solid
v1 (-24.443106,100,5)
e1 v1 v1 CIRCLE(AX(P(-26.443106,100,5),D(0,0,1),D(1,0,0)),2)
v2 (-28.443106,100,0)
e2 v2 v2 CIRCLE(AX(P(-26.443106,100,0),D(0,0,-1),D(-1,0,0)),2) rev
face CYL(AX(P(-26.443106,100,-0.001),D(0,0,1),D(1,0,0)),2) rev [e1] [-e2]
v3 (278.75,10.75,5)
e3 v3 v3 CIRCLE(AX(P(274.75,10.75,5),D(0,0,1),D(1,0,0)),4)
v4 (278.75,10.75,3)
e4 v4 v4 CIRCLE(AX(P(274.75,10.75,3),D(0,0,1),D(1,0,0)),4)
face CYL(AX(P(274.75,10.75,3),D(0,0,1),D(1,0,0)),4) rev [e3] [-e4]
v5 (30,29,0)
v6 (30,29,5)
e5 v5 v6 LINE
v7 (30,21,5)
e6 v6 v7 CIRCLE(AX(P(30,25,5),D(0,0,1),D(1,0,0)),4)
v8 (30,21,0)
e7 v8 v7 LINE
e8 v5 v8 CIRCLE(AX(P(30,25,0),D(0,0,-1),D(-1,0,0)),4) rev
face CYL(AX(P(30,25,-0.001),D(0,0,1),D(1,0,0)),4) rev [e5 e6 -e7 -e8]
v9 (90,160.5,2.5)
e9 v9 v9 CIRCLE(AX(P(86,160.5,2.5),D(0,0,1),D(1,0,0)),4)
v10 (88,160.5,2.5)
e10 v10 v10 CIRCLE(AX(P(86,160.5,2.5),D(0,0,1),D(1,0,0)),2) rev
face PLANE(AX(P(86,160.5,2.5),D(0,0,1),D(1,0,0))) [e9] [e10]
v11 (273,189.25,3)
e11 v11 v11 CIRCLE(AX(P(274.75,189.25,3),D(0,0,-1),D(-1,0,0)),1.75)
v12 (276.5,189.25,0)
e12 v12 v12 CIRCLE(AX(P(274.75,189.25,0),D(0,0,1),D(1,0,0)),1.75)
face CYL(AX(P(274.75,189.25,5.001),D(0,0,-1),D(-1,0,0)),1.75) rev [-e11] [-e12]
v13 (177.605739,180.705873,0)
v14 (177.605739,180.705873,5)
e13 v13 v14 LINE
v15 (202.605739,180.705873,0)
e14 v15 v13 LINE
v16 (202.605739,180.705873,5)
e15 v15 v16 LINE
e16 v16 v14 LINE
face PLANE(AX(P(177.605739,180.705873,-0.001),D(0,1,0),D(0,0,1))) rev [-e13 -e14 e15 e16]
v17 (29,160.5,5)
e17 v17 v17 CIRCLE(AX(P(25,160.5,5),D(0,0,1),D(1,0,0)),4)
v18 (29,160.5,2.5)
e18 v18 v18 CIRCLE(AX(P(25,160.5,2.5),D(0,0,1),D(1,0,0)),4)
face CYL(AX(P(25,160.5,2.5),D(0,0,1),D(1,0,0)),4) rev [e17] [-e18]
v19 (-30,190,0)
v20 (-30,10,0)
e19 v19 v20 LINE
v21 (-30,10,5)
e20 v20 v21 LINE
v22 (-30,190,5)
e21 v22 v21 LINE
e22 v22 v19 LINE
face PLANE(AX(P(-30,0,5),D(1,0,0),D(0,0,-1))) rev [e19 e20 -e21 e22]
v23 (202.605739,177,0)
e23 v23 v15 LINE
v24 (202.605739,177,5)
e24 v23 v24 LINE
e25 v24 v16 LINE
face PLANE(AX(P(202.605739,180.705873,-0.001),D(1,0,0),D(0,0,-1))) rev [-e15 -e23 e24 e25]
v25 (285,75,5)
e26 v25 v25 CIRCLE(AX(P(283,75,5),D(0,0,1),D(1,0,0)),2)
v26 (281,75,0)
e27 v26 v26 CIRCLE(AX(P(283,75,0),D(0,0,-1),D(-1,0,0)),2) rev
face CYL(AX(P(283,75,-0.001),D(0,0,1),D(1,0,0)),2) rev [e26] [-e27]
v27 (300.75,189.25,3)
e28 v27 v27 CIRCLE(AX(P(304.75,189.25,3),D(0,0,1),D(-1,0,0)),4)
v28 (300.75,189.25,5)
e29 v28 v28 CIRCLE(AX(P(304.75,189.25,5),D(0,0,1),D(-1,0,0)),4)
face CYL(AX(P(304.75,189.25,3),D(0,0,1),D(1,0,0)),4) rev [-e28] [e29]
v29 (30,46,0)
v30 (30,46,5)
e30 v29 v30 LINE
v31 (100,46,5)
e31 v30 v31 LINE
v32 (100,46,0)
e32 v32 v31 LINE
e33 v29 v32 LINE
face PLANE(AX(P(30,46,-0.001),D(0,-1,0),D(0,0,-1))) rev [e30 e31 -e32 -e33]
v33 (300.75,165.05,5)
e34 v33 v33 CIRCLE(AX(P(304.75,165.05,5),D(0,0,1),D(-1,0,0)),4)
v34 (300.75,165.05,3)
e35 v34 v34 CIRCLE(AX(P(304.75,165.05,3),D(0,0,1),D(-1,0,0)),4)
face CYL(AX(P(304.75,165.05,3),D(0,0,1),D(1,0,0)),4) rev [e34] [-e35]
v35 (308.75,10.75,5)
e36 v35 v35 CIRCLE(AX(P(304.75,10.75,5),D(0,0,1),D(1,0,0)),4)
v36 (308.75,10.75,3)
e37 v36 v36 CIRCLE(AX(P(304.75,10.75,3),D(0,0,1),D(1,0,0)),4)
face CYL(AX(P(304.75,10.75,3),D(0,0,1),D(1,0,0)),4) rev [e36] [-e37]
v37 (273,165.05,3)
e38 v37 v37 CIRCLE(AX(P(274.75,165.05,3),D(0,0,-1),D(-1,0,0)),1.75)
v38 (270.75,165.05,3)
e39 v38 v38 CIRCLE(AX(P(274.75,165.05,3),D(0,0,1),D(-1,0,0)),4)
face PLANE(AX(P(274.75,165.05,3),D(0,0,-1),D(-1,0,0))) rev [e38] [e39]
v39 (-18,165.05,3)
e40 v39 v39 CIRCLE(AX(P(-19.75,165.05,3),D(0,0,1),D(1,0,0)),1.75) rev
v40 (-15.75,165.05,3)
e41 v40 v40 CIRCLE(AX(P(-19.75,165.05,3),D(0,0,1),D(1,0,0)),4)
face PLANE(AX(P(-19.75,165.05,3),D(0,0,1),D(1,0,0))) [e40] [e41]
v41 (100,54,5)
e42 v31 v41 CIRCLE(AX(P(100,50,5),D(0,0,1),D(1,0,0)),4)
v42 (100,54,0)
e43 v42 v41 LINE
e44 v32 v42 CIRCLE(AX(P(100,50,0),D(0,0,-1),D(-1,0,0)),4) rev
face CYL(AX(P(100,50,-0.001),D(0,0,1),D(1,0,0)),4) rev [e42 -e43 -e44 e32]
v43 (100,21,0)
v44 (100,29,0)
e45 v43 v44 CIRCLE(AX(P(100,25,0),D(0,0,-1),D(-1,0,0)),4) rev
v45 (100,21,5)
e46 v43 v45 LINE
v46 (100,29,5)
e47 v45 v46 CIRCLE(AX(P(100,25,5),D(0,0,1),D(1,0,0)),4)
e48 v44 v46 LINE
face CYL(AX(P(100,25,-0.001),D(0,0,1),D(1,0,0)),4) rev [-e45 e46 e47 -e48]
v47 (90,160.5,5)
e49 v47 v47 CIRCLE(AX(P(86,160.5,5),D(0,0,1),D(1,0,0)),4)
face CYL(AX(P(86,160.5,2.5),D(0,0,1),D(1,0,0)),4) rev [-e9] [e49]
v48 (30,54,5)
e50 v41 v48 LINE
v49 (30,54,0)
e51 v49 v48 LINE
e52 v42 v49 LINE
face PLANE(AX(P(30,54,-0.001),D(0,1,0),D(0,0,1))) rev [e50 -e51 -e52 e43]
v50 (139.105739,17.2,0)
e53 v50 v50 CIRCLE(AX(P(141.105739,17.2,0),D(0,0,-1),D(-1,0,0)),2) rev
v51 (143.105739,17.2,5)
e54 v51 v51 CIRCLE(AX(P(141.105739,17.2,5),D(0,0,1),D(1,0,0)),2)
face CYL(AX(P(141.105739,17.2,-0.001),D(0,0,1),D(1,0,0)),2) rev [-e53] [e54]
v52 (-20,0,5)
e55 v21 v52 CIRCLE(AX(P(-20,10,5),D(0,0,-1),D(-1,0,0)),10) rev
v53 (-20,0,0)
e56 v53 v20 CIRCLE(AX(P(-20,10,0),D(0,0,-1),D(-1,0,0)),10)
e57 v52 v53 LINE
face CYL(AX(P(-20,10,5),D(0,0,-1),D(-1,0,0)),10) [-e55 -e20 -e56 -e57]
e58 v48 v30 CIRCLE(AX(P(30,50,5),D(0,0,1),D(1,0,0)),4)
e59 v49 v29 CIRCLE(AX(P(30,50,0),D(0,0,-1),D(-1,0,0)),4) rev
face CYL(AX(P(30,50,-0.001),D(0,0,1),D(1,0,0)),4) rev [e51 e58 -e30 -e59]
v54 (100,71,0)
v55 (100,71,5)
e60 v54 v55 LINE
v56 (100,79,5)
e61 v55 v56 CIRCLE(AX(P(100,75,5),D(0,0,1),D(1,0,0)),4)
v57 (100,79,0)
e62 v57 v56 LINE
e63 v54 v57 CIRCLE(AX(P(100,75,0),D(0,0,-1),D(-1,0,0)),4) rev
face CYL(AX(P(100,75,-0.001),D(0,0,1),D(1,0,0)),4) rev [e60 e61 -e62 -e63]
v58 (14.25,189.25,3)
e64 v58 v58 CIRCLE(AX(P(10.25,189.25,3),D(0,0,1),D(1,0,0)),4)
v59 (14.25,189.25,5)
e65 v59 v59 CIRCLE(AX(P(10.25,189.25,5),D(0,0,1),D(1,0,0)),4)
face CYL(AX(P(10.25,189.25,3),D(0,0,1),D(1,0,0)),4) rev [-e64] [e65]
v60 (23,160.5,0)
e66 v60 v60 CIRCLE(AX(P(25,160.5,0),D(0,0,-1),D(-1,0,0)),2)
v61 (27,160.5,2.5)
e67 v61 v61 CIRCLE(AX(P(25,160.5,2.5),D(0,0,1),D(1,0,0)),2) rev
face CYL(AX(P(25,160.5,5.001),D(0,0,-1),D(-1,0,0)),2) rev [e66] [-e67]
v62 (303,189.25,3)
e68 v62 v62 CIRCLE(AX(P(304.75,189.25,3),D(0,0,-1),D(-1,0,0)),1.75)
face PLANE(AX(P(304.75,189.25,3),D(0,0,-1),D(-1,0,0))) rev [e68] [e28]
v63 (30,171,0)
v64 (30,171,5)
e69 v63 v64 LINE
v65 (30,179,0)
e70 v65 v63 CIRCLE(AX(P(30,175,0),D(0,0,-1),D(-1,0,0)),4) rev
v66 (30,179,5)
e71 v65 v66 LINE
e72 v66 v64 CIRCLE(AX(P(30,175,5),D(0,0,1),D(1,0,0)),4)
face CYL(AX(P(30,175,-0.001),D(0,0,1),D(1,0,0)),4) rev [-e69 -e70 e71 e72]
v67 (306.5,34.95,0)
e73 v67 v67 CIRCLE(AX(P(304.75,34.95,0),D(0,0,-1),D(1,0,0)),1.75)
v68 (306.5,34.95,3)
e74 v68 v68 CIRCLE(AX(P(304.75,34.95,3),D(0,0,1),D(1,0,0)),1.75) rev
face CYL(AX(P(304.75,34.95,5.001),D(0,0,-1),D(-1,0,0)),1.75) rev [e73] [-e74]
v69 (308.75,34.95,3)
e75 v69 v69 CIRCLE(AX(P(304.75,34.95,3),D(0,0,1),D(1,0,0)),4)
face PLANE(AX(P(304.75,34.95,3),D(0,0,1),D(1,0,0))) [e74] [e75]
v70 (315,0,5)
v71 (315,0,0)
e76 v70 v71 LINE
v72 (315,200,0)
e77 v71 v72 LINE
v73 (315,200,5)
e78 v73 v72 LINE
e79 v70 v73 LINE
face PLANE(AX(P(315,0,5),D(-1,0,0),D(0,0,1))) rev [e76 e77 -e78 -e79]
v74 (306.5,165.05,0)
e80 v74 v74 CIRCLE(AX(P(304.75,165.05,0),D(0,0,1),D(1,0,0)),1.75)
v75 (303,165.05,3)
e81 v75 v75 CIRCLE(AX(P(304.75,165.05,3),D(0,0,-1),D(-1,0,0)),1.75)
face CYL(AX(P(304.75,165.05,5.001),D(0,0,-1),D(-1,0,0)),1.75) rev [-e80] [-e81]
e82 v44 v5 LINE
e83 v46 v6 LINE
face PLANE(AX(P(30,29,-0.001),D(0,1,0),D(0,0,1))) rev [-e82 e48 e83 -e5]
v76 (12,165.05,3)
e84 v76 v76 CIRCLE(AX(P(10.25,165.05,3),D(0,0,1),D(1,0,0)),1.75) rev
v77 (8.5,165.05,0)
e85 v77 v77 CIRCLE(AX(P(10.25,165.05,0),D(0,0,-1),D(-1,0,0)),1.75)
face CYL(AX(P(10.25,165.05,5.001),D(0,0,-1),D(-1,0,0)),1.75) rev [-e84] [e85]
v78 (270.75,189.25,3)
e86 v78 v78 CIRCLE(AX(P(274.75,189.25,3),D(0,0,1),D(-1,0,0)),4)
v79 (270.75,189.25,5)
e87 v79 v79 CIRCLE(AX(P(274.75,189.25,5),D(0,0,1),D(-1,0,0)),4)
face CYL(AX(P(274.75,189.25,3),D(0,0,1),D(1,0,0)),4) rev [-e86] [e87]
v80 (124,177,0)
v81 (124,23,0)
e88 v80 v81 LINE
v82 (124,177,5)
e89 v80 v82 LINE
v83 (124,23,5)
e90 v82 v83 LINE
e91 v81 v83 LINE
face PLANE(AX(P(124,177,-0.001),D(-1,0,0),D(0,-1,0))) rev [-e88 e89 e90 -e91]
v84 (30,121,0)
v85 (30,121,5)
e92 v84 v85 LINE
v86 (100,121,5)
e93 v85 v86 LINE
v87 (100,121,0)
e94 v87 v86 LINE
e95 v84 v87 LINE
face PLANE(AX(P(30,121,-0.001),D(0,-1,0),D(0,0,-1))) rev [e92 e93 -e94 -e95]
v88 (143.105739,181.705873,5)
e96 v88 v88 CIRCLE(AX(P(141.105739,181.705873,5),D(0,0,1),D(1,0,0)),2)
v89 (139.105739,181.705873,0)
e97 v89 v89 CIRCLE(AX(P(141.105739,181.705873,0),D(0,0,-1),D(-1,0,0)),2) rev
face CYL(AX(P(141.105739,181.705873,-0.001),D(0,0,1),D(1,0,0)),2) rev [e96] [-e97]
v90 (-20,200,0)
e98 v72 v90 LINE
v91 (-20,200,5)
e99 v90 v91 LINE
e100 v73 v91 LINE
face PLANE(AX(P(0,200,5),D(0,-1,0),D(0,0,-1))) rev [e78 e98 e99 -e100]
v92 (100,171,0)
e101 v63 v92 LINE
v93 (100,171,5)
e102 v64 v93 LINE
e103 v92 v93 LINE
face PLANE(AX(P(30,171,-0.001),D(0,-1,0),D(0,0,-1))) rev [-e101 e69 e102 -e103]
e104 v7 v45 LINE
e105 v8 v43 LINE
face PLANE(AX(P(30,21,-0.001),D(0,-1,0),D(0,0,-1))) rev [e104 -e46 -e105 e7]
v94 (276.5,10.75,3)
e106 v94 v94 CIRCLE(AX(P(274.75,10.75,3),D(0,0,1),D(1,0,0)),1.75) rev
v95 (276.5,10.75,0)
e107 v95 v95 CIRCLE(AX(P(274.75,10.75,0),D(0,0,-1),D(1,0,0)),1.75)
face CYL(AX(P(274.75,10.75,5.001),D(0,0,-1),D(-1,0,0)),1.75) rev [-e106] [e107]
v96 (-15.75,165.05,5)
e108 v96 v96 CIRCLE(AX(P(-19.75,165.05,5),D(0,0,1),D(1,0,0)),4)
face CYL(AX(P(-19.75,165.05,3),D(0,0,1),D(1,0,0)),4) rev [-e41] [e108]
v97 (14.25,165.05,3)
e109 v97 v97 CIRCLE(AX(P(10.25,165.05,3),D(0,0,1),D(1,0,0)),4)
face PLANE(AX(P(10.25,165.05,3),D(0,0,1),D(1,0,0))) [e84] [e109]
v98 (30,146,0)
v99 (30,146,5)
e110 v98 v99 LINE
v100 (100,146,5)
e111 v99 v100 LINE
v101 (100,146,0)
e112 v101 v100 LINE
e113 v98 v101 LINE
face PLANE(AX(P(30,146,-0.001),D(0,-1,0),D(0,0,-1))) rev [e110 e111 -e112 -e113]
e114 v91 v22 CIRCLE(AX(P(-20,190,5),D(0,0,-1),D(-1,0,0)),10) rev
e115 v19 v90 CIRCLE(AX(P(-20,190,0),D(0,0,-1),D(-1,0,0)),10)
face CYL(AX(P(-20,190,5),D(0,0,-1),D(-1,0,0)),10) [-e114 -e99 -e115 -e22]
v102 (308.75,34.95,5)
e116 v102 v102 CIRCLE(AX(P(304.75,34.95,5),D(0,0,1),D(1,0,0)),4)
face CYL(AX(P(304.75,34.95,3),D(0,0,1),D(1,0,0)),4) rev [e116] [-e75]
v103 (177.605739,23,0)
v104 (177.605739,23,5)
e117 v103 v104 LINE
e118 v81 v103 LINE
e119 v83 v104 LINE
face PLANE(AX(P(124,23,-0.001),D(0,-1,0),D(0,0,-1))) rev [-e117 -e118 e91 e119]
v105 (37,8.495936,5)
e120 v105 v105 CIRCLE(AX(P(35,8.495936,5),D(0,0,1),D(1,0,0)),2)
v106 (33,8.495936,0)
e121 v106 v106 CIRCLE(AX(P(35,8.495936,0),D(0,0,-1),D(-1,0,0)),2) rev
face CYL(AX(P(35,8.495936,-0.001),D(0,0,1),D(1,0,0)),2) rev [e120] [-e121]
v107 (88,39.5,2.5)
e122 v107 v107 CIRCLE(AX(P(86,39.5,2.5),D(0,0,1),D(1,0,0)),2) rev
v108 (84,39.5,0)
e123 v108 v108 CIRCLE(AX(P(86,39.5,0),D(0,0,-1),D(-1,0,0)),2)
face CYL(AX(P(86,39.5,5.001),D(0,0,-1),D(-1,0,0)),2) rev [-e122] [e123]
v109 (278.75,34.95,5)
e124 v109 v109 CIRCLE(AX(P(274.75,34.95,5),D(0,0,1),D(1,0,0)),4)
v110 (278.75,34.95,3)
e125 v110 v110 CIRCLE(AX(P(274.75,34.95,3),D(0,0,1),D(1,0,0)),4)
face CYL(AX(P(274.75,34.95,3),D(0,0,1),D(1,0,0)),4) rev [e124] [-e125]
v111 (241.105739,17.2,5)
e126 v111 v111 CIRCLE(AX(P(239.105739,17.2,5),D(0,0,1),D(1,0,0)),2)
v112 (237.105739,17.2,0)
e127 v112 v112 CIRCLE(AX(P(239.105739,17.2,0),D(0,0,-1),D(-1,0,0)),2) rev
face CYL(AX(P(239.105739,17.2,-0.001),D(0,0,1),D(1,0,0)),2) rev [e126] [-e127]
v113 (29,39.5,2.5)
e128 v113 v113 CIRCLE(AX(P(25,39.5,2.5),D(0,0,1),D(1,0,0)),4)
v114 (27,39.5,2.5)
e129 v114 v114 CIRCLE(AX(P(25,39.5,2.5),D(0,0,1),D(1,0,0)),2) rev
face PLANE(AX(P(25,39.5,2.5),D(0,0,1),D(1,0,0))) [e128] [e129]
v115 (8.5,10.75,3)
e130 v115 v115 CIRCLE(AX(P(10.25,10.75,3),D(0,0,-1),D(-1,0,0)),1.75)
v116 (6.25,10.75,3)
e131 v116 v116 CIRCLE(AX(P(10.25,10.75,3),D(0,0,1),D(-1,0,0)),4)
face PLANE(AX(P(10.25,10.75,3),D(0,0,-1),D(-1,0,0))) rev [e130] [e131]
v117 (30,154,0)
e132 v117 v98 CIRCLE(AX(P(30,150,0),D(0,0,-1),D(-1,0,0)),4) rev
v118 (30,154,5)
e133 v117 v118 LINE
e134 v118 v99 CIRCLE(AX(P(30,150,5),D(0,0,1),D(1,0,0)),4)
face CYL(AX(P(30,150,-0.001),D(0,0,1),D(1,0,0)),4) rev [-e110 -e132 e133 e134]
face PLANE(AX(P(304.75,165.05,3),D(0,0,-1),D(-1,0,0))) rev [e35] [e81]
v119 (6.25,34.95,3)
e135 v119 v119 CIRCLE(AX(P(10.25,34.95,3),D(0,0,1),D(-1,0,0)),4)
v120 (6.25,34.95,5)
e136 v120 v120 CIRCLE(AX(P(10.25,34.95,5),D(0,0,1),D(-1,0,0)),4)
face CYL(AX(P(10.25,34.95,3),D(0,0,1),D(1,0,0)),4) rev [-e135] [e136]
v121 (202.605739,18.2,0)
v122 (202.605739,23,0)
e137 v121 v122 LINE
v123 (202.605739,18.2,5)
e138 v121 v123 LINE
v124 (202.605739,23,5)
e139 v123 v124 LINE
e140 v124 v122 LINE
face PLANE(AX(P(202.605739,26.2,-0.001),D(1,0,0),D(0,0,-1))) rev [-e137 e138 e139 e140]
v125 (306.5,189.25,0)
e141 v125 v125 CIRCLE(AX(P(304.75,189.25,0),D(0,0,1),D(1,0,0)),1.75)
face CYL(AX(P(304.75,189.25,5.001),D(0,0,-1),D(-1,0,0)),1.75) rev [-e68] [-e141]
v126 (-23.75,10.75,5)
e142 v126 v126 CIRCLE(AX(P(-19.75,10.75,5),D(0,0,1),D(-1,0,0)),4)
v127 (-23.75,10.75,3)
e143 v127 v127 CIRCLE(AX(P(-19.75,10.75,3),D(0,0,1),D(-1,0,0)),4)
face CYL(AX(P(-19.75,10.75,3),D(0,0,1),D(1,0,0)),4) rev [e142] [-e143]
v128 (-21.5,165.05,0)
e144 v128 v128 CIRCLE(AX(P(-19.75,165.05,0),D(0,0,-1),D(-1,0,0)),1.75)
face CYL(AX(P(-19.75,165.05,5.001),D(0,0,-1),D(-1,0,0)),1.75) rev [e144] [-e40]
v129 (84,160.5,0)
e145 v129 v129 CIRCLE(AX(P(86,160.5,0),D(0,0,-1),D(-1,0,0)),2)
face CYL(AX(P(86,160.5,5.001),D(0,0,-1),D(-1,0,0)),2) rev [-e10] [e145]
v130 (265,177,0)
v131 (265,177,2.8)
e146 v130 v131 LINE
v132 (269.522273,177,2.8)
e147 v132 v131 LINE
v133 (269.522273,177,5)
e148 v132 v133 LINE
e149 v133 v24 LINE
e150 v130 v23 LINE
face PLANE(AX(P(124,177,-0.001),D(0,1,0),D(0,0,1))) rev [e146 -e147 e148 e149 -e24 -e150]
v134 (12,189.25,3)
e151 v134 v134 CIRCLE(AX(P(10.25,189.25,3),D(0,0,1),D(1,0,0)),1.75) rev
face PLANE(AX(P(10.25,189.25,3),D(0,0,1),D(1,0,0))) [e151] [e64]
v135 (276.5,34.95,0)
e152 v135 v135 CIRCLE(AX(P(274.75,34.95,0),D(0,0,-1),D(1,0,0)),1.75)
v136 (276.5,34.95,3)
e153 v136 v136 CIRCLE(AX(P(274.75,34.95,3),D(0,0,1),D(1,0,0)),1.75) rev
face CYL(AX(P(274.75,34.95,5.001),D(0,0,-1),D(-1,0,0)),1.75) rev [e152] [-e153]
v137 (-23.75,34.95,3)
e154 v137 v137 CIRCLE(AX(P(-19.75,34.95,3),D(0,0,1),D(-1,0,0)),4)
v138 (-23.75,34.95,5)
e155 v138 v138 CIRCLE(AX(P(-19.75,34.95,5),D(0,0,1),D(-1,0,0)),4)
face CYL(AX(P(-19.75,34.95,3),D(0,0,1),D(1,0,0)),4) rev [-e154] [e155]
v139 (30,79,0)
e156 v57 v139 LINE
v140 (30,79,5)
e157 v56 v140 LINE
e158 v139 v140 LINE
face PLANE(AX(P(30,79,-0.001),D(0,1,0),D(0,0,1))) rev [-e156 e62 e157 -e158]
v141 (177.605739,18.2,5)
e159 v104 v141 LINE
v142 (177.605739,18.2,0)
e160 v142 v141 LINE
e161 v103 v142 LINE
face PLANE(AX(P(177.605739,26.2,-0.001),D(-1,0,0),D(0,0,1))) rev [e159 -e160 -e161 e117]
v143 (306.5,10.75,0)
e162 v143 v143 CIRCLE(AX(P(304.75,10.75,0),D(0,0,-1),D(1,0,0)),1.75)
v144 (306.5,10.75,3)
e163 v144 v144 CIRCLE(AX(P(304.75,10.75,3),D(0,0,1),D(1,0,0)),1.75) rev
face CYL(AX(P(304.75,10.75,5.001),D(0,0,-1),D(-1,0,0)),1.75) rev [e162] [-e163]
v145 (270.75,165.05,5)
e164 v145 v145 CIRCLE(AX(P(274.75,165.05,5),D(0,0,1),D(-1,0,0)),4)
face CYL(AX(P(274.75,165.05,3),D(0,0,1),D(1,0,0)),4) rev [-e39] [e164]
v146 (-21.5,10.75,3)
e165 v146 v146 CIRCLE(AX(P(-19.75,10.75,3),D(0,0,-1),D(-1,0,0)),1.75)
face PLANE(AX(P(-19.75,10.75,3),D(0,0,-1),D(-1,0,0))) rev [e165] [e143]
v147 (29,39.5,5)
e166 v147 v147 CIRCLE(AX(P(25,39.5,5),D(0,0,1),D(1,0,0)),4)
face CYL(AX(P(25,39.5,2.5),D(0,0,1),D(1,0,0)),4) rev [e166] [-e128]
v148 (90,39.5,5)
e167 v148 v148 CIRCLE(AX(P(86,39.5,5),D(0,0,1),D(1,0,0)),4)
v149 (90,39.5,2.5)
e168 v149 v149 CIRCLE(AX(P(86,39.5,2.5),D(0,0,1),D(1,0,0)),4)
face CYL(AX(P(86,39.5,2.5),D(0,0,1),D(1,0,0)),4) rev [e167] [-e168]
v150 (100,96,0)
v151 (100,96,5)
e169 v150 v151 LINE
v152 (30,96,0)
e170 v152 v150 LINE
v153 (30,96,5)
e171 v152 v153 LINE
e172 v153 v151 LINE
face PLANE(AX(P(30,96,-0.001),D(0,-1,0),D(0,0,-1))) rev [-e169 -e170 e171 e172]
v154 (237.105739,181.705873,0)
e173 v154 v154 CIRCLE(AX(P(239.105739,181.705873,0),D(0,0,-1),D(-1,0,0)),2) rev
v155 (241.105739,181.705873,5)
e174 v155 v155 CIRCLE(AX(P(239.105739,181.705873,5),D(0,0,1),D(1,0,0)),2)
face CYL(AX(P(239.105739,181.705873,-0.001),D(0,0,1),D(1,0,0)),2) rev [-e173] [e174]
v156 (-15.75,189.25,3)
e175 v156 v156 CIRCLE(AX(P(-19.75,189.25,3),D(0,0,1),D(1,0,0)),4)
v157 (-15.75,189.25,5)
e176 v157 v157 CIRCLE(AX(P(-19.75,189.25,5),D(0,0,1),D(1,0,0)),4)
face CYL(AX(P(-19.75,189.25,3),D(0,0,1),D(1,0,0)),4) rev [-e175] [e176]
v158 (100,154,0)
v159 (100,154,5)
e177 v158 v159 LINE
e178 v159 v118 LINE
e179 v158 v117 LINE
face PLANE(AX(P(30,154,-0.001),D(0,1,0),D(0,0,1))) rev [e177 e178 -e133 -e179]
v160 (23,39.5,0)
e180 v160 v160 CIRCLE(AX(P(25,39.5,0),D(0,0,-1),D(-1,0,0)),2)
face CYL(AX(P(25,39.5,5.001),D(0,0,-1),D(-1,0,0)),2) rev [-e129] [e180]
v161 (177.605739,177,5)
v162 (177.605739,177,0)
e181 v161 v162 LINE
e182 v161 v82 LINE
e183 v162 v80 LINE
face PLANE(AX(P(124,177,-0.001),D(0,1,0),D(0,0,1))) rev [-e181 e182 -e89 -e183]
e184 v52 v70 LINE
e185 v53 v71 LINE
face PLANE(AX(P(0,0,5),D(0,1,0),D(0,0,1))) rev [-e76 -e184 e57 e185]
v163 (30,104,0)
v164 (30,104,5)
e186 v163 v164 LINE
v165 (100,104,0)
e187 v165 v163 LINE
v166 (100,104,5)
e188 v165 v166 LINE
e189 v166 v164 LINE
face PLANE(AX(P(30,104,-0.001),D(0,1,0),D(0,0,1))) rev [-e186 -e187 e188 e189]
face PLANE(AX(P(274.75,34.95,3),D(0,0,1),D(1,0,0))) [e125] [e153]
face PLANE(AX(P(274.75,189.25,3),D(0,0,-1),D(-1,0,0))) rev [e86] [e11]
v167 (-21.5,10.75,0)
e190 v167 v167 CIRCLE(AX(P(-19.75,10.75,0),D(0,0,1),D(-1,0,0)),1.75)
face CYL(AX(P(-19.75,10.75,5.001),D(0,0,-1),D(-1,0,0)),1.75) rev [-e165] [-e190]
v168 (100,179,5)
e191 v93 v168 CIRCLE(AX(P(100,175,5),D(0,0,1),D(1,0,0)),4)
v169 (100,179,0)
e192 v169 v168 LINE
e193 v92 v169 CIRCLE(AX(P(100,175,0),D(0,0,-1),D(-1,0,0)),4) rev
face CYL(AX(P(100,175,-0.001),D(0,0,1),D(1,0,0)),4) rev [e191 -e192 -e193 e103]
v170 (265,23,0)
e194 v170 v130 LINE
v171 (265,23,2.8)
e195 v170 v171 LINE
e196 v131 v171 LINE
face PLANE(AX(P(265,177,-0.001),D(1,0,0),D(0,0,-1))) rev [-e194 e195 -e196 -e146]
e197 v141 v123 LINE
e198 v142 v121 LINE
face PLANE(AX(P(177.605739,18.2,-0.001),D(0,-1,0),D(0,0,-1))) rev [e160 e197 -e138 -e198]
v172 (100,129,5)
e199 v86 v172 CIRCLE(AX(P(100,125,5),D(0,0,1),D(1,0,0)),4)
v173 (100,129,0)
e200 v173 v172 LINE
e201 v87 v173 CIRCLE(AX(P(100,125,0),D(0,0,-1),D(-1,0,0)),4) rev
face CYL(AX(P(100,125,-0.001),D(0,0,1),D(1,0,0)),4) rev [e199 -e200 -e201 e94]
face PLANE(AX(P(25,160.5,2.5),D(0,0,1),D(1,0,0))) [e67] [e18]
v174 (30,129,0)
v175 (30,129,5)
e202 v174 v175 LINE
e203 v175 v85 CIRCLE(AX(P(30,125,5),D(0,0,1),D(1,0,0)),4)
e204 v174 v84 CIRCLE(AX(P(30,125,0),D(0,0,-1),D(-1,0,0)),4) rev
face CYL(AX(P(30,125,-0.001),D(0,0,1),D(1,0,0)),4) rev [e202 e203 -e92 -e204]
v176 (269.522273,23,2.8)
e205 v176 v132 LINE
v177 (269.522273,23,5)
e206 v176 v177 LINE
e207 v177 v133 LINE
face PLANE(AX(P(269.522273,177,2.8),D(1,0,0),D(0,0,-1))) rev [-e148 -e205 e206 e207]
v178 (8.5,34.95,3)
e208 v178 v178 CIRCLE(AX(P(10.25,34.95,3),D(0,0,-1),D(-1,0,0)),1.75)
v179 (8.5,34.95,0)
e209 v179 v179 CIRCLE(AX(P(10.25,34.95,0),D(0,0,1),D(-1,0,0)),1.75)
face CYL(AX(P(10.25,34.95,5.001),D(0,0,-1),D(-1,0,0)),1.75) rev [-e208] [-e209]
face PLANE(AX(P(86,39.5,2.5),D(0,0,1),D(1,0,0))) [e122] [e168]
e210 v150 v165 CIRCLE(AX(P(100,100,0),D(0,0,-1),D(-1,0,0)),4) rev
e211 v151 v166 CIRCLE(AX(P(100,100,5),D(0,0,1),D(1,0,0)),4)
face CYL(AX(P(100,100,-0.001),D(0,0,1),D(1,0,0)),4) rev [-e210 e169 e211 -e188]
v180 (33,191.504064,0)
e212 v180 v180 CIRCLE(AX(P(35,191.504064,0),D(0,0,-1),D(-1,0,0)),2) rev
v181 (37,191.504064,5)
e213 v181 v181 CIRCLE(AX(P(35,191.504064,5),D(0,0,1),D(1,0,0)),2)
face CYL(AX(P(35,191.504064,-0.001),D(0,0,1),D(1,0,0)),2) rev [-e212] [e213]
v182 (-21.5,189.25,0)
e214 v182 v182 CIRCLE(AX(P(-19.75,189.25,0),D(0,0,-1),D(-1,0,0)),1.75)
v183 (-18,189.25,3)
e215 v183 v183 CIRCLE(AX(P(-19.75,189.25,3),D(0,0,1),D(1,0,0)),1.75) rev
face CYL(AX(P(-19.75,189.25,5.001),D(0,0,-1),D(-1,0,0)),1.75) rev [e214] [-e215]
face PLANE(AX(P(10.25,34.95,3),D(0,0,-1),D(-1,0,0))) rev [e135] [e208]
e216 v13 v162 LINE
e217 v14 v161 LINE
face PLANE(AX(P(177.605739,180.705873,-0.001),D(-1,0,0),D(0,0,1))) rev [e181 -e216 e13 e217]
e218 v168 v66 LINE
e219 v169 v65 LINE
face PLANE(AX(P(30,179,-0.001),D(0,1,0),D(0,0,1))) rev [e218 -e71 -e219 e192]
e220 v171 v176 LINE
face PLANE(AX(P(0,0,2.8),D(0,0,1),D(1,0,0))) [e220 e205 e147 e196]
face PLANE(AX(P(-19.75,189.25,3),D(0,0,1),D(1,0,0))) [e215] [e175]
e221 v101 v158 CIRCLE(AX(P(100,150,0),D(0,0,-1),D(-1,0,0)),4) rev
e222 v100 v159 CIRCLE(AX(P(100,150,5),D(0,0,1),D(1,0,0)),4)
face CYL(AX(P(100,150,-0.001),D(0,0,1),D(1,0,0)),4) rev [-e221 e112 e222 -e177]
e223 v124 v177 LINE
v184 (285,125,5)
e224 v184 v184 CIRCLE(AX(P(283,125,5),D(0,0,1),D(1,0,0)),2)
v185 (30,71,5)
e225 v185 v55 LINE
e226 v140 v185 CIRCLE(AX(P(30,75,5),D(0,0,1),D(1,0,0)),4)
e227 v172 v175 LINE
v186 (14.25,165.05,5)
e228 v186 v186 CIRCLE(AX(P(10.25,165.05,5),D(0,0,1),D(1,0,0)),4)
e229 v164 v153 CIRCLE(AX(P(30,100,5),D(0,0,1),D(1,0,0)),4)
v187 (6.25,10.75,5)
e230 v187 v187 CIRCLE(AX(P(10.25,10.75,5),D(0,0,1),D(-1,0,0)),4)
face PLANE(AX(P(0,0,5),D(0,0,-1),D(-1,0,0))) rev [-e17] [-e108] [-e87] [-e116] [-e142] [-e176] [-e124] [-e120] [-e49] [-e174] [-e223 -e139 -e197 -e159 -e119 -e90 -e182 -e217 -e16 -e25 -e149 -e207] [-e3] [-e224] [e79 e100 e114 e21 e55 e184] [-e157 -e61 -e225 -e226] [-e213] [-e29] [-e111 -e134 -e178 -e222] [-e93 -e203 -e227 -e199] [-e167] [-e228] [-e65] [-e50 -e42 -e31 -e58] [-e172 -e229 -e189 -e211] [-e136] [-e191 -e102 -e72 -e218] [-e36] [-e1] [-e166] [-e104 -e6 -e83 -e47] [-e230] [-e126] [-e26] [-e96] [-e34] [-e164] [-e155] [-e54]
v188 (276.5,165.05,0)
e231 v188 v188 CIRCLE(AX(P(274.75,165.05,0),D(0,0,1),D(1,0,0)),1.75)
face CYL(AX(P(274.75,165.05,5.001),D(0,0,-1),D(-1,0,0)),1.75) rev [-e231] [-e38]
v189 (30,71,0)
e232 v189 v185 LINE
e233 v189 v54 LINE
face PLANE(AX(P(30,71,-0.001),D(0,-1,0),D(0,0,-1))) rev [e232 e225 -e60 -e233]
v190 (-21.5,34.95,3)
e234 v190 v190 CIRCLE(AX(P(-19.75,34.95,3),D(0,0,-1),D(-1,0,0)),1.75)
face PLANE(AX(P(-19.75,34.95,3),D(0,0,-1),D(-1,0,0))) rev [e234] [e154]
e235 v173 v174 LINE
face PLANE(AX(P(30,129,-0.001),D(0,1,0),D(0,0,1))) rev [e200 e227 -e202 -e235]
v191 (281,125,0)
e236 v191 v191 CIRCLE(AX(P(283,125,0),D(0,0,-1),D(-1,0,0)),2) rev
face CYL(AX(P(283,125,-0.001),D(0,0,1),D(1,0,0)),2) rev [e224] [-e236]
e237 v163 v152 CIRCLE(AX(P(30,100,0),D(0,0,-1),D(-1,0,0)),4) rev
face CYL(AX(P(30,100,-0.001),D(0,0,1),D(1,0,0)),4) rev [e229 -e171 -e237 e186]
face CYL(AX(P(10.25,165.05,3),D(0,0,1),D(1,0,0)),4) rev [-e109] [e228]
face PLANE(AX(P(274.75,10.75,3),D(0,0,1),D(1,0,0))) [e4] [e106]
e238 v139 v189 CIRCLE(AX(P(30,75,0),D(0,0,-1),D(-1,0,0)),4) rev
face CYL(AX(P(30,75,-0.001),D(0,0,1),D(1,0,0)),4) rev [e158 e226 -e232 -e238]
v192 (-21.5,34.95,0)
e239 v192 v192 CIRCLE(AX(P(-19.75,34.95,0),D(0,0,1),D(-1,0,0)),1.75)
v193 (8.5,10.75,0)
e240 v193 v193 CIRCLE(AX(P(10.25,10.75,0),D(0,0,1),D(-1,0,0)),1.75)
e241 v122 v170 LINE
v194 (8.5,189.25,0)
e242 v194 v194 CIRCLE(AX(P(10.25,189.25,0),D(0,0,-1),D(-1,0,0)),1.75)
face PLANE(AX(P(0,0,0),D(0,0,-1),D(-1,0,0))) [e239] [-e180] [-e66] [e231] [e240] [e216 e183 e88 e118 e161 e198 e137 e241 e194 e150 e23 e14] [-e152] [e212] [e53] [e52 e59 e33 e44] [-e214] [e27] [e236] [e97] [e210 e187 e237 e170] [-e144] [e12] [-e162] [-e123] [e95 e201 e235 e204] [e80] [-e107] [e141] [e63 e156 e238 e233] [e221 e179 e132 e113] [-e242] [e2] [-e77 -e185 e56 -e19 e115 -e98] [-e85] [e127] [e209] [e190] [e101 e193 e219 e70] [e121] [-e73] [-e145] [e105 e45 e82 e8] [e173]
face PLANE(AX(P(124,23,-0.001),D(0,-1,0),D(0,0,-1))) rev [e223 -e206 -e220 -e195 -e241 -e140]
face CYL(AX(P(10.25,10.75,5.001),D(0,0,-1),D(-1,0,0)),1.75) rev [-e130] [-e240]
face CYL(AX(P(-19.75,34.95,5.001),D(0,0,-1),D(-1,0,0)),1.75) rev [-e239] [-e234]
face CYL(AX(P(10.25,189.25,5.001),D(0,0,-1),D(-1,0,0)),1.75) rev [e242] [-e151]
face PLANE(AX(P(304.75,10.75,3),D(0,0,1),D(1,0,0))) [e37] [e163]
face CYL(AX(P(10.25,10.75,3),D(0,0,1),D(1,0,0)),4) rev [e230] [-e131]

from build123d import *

# Parameters (mm, degrees)
SKETCH_1_W               = 300
SKETCH_1_H               = 200
EXTRUDE_1_DEPTH          = 5
MOVE_BODY_1_OUTLINE_W    = 30
MOVE_BODY_1_OUTLINE_H    = 5
MOVE_BODY_1_DEPTH        = 200
MOVE_BODY_1_2_OUTLINE_W  = 30
MOVE_BODY_1_2_OUTLINE_H  = 5
MOVE_BODY_1_2_DEPTH      = 200
SKETCH_13_W              = 30
SKETCH_13_H              = 5
EXTRUDE_2_DEPTH          = 200
CUT_EXTRUDE_1_REACH      = 362.59
SKETCH_2_R               = 1.75
MIRROR_2_COPY_1_REACH    = 362.59
MIRROR_2_COPY_1_SKETCH_R = 1.75
SKETCH_5_R               = 4
CUT_EXTRUDE_4_DEPTH      = 2
FILLET_1_R               = 10
CUT_EXTRUDE_5_REACH      = 362.59
SKETCH_6_R               = 2
CUT_EXTRUDE_8_REACH      = 362.59
PATTERN_LINEAR_2_COUNT   = 4
PATTERN_LINEAR_2_PITCH   = 25
PATTERN_LINEAR_3_COUNT   = 4
PATTERN_LINEAR_3_PITCH   = 25
CUT_EXTRUDE_12_REACH     = 362.59
SKETCH_15_R              = 2
SKETCH_17_R              = 4
CUT_EXTRUDE_14_DEPTH     = 2.5
SKETCH_19_W              = 15
SKETCH_19_H              = 5
EXTRUDE_3_DEPTH          = 200
CUT_EXTRUDE_16_REACH     = 375.162
SKETCH_20_W              = 141
SKETCH_20_H              = 154
SKETCH_21_W              = 4.522273238
SKETCH_21_H              = 154
CUT_EXTRUDE_17_DEPTH     = 2.2
CUT_EXTRUDE_18_REACH     = 375.162
SKETCH_18_W              = 25
SKETCH_18_H              = 8
CUT_EXTRUDE_19_REACH     = 375.162
SKETCH_14_R              = 2
CUT_EXTRUDE_20_REACH     = 375.162
SKETCH_11_R              = 2


# Read off the part's stored shape, not the designer's step: 实体-移动/复制1
with BuildPart() as part:
    # 草图1 → 凸台-拉伸1 (new body)
    with BuildSketch(Plane.XY):
        with Locations((150, 100)):
            Rectangle(SKETCH_1_W, SKETCH_1_H)
    extrude(amount=EXTRUDE_1_DEPTH)


with BuildPart() as body_2:
    # Split Bodies 1: the piece on the far side of the plane
    add(part.part)
    split(bisect_by=Plane(origin=(150, 0, 0), x_dir=(0, 0, -1), z_dir=(-1, 0, 0)), keep=Keep.BOTTOM)


with BuildPart() as part_1:
    add(part.part)

    # Split Bodies 1
    split(bisect_by=Plane(origin=(150, 0, 0), x_dir=(0, 0, -1), z_dir=(-1, 0, 0)), keep=Keep.TOP)

    # Move Body 1 outline → Move Body 1 (cut)
    with BuildSketch(Plane(origin=(0, 0, 0), x_dir=(1, 0, 0), z_dir=(0, 1, 0))):
        with Locations((135, -2.5)):
            Rectangle(MOVE_BODY_1_OUTLINE_W, MOVE_BODY_1_OUTLINE_H)
    extrude(amount=MOVE_BODY_1_DEPTH, mode=Mode.SUBTRACT)

    # Move Body 1 2 outline → Move Body 1 2 (add)
    with BuildSketch(Plane(origin=(0, 0, 0), x_dir=(1, 0, 0), z_dir=(0, 1, 0))):
        with Locations((-15, -2.5)):
            Rectangle(MOVE_BODY_1_2_OUTLINE_W, MOVE_BODY_1_2_OUTLINE_H)
    extrude(amount=MOVE_BODY_1_2_DEPTH)

    add(body_2.part)  # 凸台-拉伸2 merges body 2
    # 草图13 → 凸台-拉伸2 (add)
    with BuildSketch(Plane.XZ):
        with Locations((135, 2.5)):
            Rectangle(SKETCH_13_W, SKETCH_13_H)
    extrude(amount=-EXTRUDE_2_DEPTH)

    # 草图2 → 切除-拉伸1 (cut, up to next)
    with BuildSketch(Plane(origin=(0, 0, 0), x_dir=(-1, 0, 0), z_dir=(0, 0, -1)), mode=Mode.PRIVATE) as cut_extrude_1_sk1:
        with Locations((-10.25, 189.25)):
            Circle(SKETCH_2_R)
    cut_extrude_1_tool1 = extrude(cut_extrude_1_sk1.sketch, amount=-CUT_EXTRUDE_1_REACH, mode=Mode.PRIVATE) & part_1.part
    # 草图2 → 切除-拉伸1 (cut, up to next)
    with BuildSketch(Plane(origin=(0, 0, 0), x_dir=(-1, 0, 0), z_dir=(0, 0, -1)), mode=Mode.PRIVATE) as cut_extrude_1_sk2:
        with Locations((19.75, 189.25)):
            Circle(SKETCH_2_R)
    cut_extrude_1_tool2 = extrude(cut_extrude_1_sk2.sketch, amount=-CUT_EXTRUDE_1_REACH, mode=Mode.PRIVATE) & part_1.part
    # 草图2 → 切除-拉伸1 (cut, up to next)
    with BuildSketch(Plane(origin=(0, 0, 0), x_dir=(-1, 0, 0), z_dir=(0, 0, -1)), mode=Mode.PRIVATE) as cut_extrude_1_sk3:
        with Locations((19.75, 165.05)):
            Circle(SKETCH_2_R)
    cut_extrude_1_tool3 = extrude(cut_extrude_1_sk3.sketch, amount=-CUT_EXTRUDE_1_REACH, mode=Mode.PRIVATE) & part_1.part
    # 草图2 → 切除-拉伸1 (cut, up to next)
    with BuildSketch(Plane(origin=(0, 0, 0), x_dir=(-1, 0, 0), z_dir=(0, 0, -1)), mode=Mode.PRIVATE) as cut_extrude_1_sk4:
        with Locations((-10.25, 165.05)):
            Circle(SKETCH_2_R)
    cut_extrude_1_tool4 = extrude(cut_extrude_1_sk4.sketch, amount=-CUT_EXTRUDE_1_REACH, mode=Mode.PRIVATE) & part_1.part
    cut_extrude_1_1 = cut_extrude_1_tool1.solids().sort_by_distance((10.25, 189.25, 0))[0]
    add(cut_extrude_1_1, mode=Mode.SUBTRACT)
    cut_extrude_1_2 = cut_extrude_1_tool2.solids().sort_by_distance((-19.75, 189.25, 0))[0]
    add(cut_extrude_1_2, mode=Mode.SUBTRACT)
    cut_extrude_1_3 = cut_extrude_1_tool3.solids().sort_by_distance((-19.75, 165.05, 0))[0]
    add(cut_extrude_1_3, mode=Mode.SUBTRACT)
    cut_extrude_1_4 = cut_extrude_1_tool4.solids().sort_by_distance((10.25, 165.05, 0))[0]
    add(cut_extrude_1_4, mode=Mode.SUBTRACT)
    cut_extrude_1 = cut_extrude_1_1 + cut_extrude_1_2 + cut_extrude_1_3 + cut_extrude_1_4  # 切除-拉伸1 as one shape, for the pattern or mirror that repeats it

    # 镜向1: 切除-拉伸1 across plane
    add(cut_extrude_1.mirror(Plane.ZX.offset(100)), mode=Mode.SUBTRACT)

    # 镜向2: 切除-拉伸1 across plane
    add(cut_extrude_1.mirror(Plane(origin=(135, 0, 0), x_dir=(0, 0, 1), z_dir=(1, 0, 0))), mode=Mode.SUBTRACT)

    # 镜向2 copy 1 sketch → 镜向2 copy 1 (cut, up to next)
    with BuildSketch(Plane(origin=(270, 200, 0), x_dir=(1, 0, 0), z_dir=(0, 0, -1)), mode=Mode.PRIVATE) as mirror_2_copy_1_sk1:
        with Locations((-10.25, 189.25)):
            Circle(MIRROR_2_COPY_1_SKETCH_R)
    mirror_2_copy_1_tool1 = extrude(mirror_2_copy_1_sk1.sketch, amount=-MIRROR_2_COPY_1_REACH, mode=Mode.PRIVATE) & part_1.part
    # 镜向2 copy 1 sketch → 镜向2 copy 1 (cut, up to next)
    with BuildSketch(Plane(origin=(270, 200, 0), x_dir=(1, 0, 0), z_dir=(0, 0, -1)), mode=Mode.PRIVATE) as mirror_2_copy_1_sk2:
        with Locations((19.75, 189.25)):
            Circle(MIRROR_2_COPY_1_SKETCH_R)
    mirror_2_copy_1_tool2 = extrude(mirror_2_copy_1_sk2.sketch, amount=-MIRROR_2_COPY_1_REACH, mode=Mode.PRIVATE) & part_1.part
    # 镜向2 copy 1 sketch → 镜向2 copy 1 (cut, up to next)
    with BuildSketch(Plane(origin=(270, 200, 0), x_dir=(1, 0, 0), z_dir=(0, 0, -1)), mode=Mode.PRIVATE) as mirror_2_copy_1_sk3:
        with Locations((19.75, 165.05)):
            Circle(MIRROR_2_COPY_1_SKETCH_R)
    mirror_2_copy_1_tool3 = extrude(mirror_2_copy_1_sk3.sketch, amount=-MIRROR_2_COPY_1_REACH, mode=Mode.PRIVATE) & part_1.part
    # 镜向2 copy 1 sketch → 镜向2 copy 1 (cut, up to next)
    with BuildSketch(Plane(origin=(270, 200, 0), x_dir=(1, 0, 0), z_dir=(0, 0, -1)), mode=Mode.PRIVATE) as mirror_2_copy_1_sk4:
        with Locations((-10.25, 165.05)):
            Circle(MIRROR_2_COPY_1_SKETCH_R)
    mirror_2_copy_1_tool4 = extrude(mirror_2_copy_1_sk4.sketch, amount=-MIRROR_2_COPY_1_REACH, mode=Mode.PRIVATE) & part_1.part
    add(mirror_2_copy_1_tool1.solids().sort_by_distance((259.75, 10.75, 0))[0], mode=Mode.SUBTRACT)
    add(mirror_2_copy_1_tool2.solids().sort_by_distance((289.75, 10.75, 0))[0], mode=Mode.SUBTRACT)
    add(mirror_2_copy_1_tool3.solids().sort_by_distance((289.75, 34.95, 0))[0], mode=Mode.SUBTRACT)
    add(mirror_2_copy_1_tool4.solids().sort_by_distance((259.75, 34.95, 0))[0], mode=Mode.SUBTRACT)

    # 草图5 → 切除-拉伸4 (cut)
    with BuildSketch(Plane.XY.offset(5)):
        with Locations((-19.75, 189.25)):
            Circle(SKETCH_5_R)
        with Locations((-19.75, 165.05)):
            Circle(SKETCH_5_R)
        with Locations((10.25, 189.25)):
            Circle(SKETCH_5_R)
        with Locations((10.25, 165.05)):
            Circle(SKETCH_5_R)
        with Locations(Location((10.25, 34.95, 0), (0, 0, 180))):
            Circle(SKETCH_5_R)
        with Locations(Location((10.25, 10.75, 0), (0, 0, 180))):
            Circle(SKETCH_5_R)
        with Locations(Location((-19.75, 34.95, 0), (0, 0, 180))):
            Circle(SKETCH_5_R)
        with Locations(Location((-19.75, 10.75, 0), (0, 0, 180))):
            Circle(SKETCH_5_R)
        with Locations((289.75, 10.75)):
            Circle(SKETCH_5_R)
        with Locations((289.75, 34.95)):
            Circle(SKETCH_5_R)
        with Locations((259.75, 10.75)):
            Circle(SKETCH_5_R)
        with Locations((259.75, 34.95)):
            Circle(SKETCH_5_R)
        with Locations(Location((259.75, 165.05, 0), (0, 0, 180))):
            Circle(SKETCH_5_R)
        with Locations(Location((259.75, 189.25, 0), (0, 0, 180))):
            Circle(SKETCH_5_R)
        with Locations(Location((289.75, 165.05, 0), (0, 0, 180))):
            Circle(SKETCH_5_R)
        with Locations(Location((289.75, 189.25, 0), (0, 0, 180))):
            Circle(SKETCH_5_R)
    extrude(amount=-CUT_EXTRUDE_4_DEPTH, mode=Mode.SUBTRACT)

    # 圆角1
    fillet_1_edges = [part_1.edges().sort_by_distance(p)[0] for p in [
        (-30, 200, 2.5),
        (-30, 0, 2.5),
    ]]
    fillet(fillet_1_edges, radius=FILLET_1_R)

    # 草图6 → 切除-拉伸5 (cut, up to next)
    with BuildSketch(Plane.XY.offset(5), mode=Mode.PRIVATE) as cut_extrude_5_sk1:
        with Locations((35, 191.504064166)):
            Circle(SKETCH_6_R)
    cut_extrude_5_tool1 = extrude(cut_extrude_5_sk1.sketch, amount=-CUT_EXTRUDE_5_REACH, mode=Mode.PRIVATE) & part_1.part
    # 草图6 → 切除-拉伸5 (cut, up to next)
    with BuildSketch(Plane.XY.offset(5), mode=Mode.PRIVATE) as cut_extrude_5_sk2:
        with Locations((35, 8.495935834)):
            Circle(SKETCH_6_R)
    cut_extrude_5_tool2 = extrude(cut_extrude_5_sk2.sketch, amount=-CUT_EXTRUDE_5_REACH, mode=Mode.PRIVATE) & part_1.part
    # 草图6 → 切除-拉伸5 (cut, up to next)
    with BuildSketch(Plane.XY.offset(5), mode=Mode.PRIVATE) as cut_extrude_5_sk3:
        with Locations((-26.443105822, 100)):
            Circle(SKETCH_6_R)
    cut_extrude_5_tool3 = extrude(cut_extrude_5_sk3.sketch, amount=-CUT_EXTRUDE_5_REACH, mode=Mode.PRIVATE) & part_1.part
    add(cut_extrude_5_tool1.solids().sort_by_distance((35, 191.504064, 5))[0], mode=Mode.SUBTRACT)
    add(cut_extrude_5_tool2.solids().sort_by_distance((35, 8.495936, 5))[0], mode=Mode.SUBTRACT)
    add(cut_extrude_5_tool3.solids().sort_by_distance((-26.443106, 100, 5))[0], mode=Mode.SUBTRACT)

    # 草图10 → 切除-拉伸8 (cut, up to next)
    with BuildSketch(Plane.XY.offset(5), mode=Mode.PRIVATE) as cut_extrude_8_sk1:
        with BuildLine():
            Line((30, 104), (100, 104))
            ThreePointArc((100, 104), (104, 100), (100, 96))
            Line((100, 96), (30, 96))
            ThreePointArc((30, 96), (26, 100), (30, 104))
        make_face()
    cut_extrude_8_tool1 = extrude(cut_extrude_8_sk1.sketch, amount=-CUT_EXTRUDE_8_REACH, mode=Mode.PRIVATE) & part_1.part
    cut_extrude_8 = cut_extrude_8_tool1.solids().sort_by_distance((65, 100, 5))[0]
    add(cut_extrude_8, mode=Mode.SUBTRACT)

    # 阵列(线性)2: 切除-拉伸8 ×4
    with Locations(*[(0, i * PATTERN_LINEAR_2_PITCH, 0) for i in range(1, PATTERN_LINEAR_2_COUNT)]):
        add(cut_extrude_8, mode=Mode.SUBTRACT)

    # 阵列(线性)3: 切除-拉伸8 ×4
    with Locations(*[(0, -i * PATTERN_LINEAR_3_PITCH, 0) for i in range(1, PATTERN_LINEAR_3_COUNT)]):
        add(cut_extrude_8, mode=Mode.SUBTRACT)

    # 草图15 → 切除-拉伸12 (cut, up to next)
    with BuildSketch(Plane(origin=(0, 0, 0), x_dir=(-1, 0, 0), z_dir=(0, 0, -1)), mode=Mode.PRIVATE) as cut_extrude_12_sk1:
        with Locations((-25, 39.5)):
            Circle(SKETCH_15_R)
    cut_extrude_12_tool1 = extrude(cut_extrude_12_sk1.sketch, amount=-CUT_EXTRUDE_12_REACH, mode=Mode.PRIVATE) & part_1.part
    # 草图15 → 切除-拉伸12 (cut, up to next)
    with BuildSketch(Plane(origin=(0, 0, 0), x_dir=(-1, 0, 0), z_dir=(0, 0, -1)), mode=Mode.PRIVATE) as cut_extrude_12_sk2:
        with Locations((-86, 39.5)):
            Circle(SKETCH_15_R)
    cut_extrude_12_tool2 = extrude(cut_extrude_12_sk2.sketch, amount=-CUT_EXTRUDE_12_REACH, mode=Mode.PRIVATE) & part_1.part
    # 草图15 → 切除-拉伸12 (cut, up to next)
    with BuildSketch(Plane(origin=(0, 0, 0), x_dir=(-1, 0, 0), z_dir=(0, 0, -1)), mode=Mode.PRIVATE) as cut_extrude_12_sk3:
        with Locations((-86, 160.5)):
            Circle(SKETCH_15_R)
    cut_extrude_12_tool3 = extrude(cut_extrude_12_sk3.sketch, amount=-CUT_EXTRUDE_12_REACH, mode=Mode.PRIVATE) & part_1.part
    # 草图15 → 切除-拉伸12 (cut, up to next)
    with BuildSketch(Plane(origin=(0, 0, 0), x_dir=(-1, 0, 0), z_dir=(0, 0, -1)), mode=Mode.PRIVATE) as cut_extrude_12_sk4:
        with Locations((-25, 160.5)):
            Circle(SKETCH_15_R)
    cut_extrude_12_tool4 = extrude(cut_extrude_12_sk4.sketch, amount=-CUT_EXTRUDE_12_REACH, mode=Mode.PRIVATE) & part_1.part
    add(cut_extrude_12_tool1.solids().sort_by_distance((25, 39.5, 0))[0], mode=Mode.SUBTRACT)
    add(cut_extrude_12_tool2.solids().sort_by_distance((86, 39.5, 0))[0], mode=Mode.SUBTRACT)
    add(cut_extrude_12_tool3.solids().sort_by_distance((86, 160.5, 0))[0], mode=Mode.SUBTRACT)
    add(cut_extrude_12_tool4.solids().sort_by_distance((25, 160.5, 0))[0], mode=Mode.SUBTRACT)

    # 草图17 → 切除-拉伸14 (cut)
    with BuildSketch(Plane.XY.offset(5)):
        with Locations((25, 160.5)):
            Circle(SKETCH_17_R)
        with Locations((86, 160.5)):
            Circle(SKETCH_17_R)
        with Locations((86, 39.5)):
            Circle(SKETCH_17_R)
        with Locations((25, 39.5)):
            Circle(SKETCH_17_R)
    extrude(amount=-CUT_EXTRUDE_14_DEPTH, mode=Mode.SUBTRACT)


with BuildPart() as body_2_2:
    # Split Bodies 2: the piece on the far side of the plane
    add(part_1.part)
    split(bisect_by=Plane(origin=(125, 0, 0), x_dir=(0, 0, 1), z_dir=(1, 0, 0)), keep=Keep.BOTTOM)


with BuildPart() as part_2:
    add(part_1.part)

    # Split Bodies 2
    split(bisect_by=Plane(origin=(125, 0, 0), x_dir=(0, 0, 1), z_dir=(1, 0, 0)), keep=Keep.TOP)


with BuildPart() as part_3:
    # Move Body 2: moved
    add(part_2.part.moved(Location((15, 0, 0))))


    add(body_2_2.part)  # 凸台-拉伸3 merges body 2 2
    # 草图19 → 凸台-拉伸3 (add)
    with BuildSketch(Plane.XZ):
        with Locations((132.5, 2.5)):
            Rectangle(SKETCH_19_W, SKETCH_19_H)
    extrude(amount=-EXTRUDE_3_DEPTH)

    # 草图20 → 切除-拉伸16 (cut, up to next)
    with BuildSketch(Plane.XY.offset(5), mode=Mode.PRIVATE) as cut_extrude_16_sk1:
        with Locations((194.5, 100)):
            Rectangle(SKETCH_20_W, SKETCH_20_H)
    cut_extrude_16_tool1 = extrude(cut_extrude_16_sk1.sketch, amount=-CUT_EXTRUDE_16_REACH, mode=Mode.PRIVATE) & part_3.part
    add(cut_extrude_16_tool1.solids().sort_by_distance((194.5, 100, 5))[0], mode=Mode.SUBTRACT)

    # 草图21 → 切除-拉伸17 (cut)
    with BuildSketch(Plane.XY.offset(5)):
        with Locations((267.261136619, 100)):
            Rectangle(SKETCH_21_W, SKETCH_21_H)
    extrude(amount=-CUT_EXTRUDE_17_DEPTH, mode=Mode.SUBTRACT)

    # 草图18 → 切除-拉伸18 (cut, up to next)
    with BuildSketch(Plane.XY.offset(5), mode=Mode.PRIVATE) as cut_extrude_18_sk1:
        with Locations((190.105739272, 22.2)):
            Rectangle(SKETCH_18_W, SKETCH_18_H)
    cut_extrude_18_tool1 = extrude(cut_extrude_18_sk1.sketch, amount=-CUT_EXTRUDE_18_REACH, mode=Mode.PRIVATE) & part_3.part
    # 草图18 → 切除-拉伸18 (cut, up to next)
    with BuildSketch(Plane.XY.offset(5), mode=Mode.PRIVATE) as cut_extrude_18_sk2:
        with Locations((190.105739272, 176.705873107)):
            Rectangle(SKETCH_18_W, SKETCH_18_H)
    cut_extrude_18_tool2 = extrude(cut_extrude_18_sk2.sketch, amount=-CUT_EXTRUDE_18_REACH, mode=Mode.PRIVATE) & part_3.part
    add(cut_extrude_18_tool1.solids().sort_by_distance((190.105739, 22.2, 5))[0], mode=Mode.SUBTRACT)
    add(cut_extrude_18_tool2.solids().sort_by_distance((190.105739, 176.705873, 5))[0], mode=Mode.SUBTRACT)

    # 草图14 → 切除-拉伸19 (cut, up to next)
    with BuildSketch(Plane.XY.offset(5), mode=Mode.PRIVATE) as cut_extrude_19_sk1:
        with Locations((141.105739272, 17.2)):
            Circle(SKETCH_14_R)
    cut_extrude_19_tool1 = extrude(cut_extrude_19_sk1.sketch, amount=-CUT_EXTRUDE_19_REACH, mode=Mode.PRIVATE) & part_3.part
    # 草图14 → 切除-拉伸19 (cut, up to next)
    with BuildSketch(Plane.XY.offset(5), mode=Mode.PRIVATE) as cut_extrude_19_sk2:
        with Locations((239.105739272, 17.2)):
            Circle(SKETCH_14_R)
    cut_extrude_19_tool2 = extrude(cut_extrude_19_sk2.sketch, amount=-CUT_EXTRUDE_19_REACH, mode=Mode.PRIVATE) & part_3.part
    # 草图14 → 切除-拉伸19 (cut, up to next)
    with BuildSketch(Plane.XY.offset(5), mode=Mode.PRIVATE) as cut_extrude_19_sk3:
        with Locations((239.105739272, 181.705873107)):
            Circle(SKETCH_14_R)
    cut_extrude_19_tool3 = extrude(cut_extrude_19_sk3.sketch, amount=-CUT_EXTRUDE_19_REACH, mode=Mode.PRIVATE) & part_3.part
    # 草图14 → 切除-拉伸19 (cut, up to next)
    with BuildSketch(Plane.XY.offset(5), mode=Mode.PRIVATE) as cut_extrude_19_sk4:
        with Locations((141.105739272, 181.705873107)):
            Circle(SKETCH_14_R)
    cut_extrude_19_tool4 = extrude(cut_extrude_19_sk4.sketch, amount=-CUT_EXTRUDE_19_REACH, mode=Mode.PRIVATE) & part_3.part
    add(cut_extrude_19_tool1.solids().sort_by_distance((141.105739, 17.2, 5))[0], mode=Mode.SUBTRACT)
    add(cut_extrude_19_tool2.solids().sort_by_distance((239.105739, 17.2, 5))[0], mode=Mode.SUBTRACT)
    add(cut_extrude_19_tool3.solids().sort_by_distance((239.105739, 181.705873, 5))[0], mode=Mode.SUBTRACT)
    add(cut_extrude_19_tool4.solids().sort_by_distance((141.105739, 181.705873, 5))[0], mode=Mode.SUBTRACT)

    # 草图11 → 切除-拉伸20 (cut, up to next)
    with BuildSketch(Plane.XY.offset(5), mode=Mode.PRIVATE) as cut_extrude_20_sk1:
        with Locations((283, 125)):
            Circle(SKETCH_11_R)
    cut_extrude_20_tool1 = extrude(cut_extrude_20_sk1.sketch, amount=-CUT_EXTRUDE_20_REACH, mode=Mode.PRIVATE) & part_3.part
    # 草图11 → 切除-拉伸20 (cut, up to next)
    with BuildSketch(Plane.XY.offset(5), mode=Mode.PRIVATE) as cut_extrude_20_sk2:
        with Locations((283, 75)):
            Circle(SKETCH_11_R)
    cut_extrude_20_tool2 = extrude(cut_extrude_20_sk2.sketch, amount=-CUT_EXTRUDE_20_REACH, mode=Mode.PRIVATE) & part_3.part
    add(cut_extrude_20_tool1.solids().sort_by_distance((283, 125, 5))[0], mode=Mode.SUBTRACT)
    add(cut_extrude_20_tool2.solids().sort_by_distance((283, 75, 5))[0], mode=Mode.SUBTRACT)


solid = part_3.part
